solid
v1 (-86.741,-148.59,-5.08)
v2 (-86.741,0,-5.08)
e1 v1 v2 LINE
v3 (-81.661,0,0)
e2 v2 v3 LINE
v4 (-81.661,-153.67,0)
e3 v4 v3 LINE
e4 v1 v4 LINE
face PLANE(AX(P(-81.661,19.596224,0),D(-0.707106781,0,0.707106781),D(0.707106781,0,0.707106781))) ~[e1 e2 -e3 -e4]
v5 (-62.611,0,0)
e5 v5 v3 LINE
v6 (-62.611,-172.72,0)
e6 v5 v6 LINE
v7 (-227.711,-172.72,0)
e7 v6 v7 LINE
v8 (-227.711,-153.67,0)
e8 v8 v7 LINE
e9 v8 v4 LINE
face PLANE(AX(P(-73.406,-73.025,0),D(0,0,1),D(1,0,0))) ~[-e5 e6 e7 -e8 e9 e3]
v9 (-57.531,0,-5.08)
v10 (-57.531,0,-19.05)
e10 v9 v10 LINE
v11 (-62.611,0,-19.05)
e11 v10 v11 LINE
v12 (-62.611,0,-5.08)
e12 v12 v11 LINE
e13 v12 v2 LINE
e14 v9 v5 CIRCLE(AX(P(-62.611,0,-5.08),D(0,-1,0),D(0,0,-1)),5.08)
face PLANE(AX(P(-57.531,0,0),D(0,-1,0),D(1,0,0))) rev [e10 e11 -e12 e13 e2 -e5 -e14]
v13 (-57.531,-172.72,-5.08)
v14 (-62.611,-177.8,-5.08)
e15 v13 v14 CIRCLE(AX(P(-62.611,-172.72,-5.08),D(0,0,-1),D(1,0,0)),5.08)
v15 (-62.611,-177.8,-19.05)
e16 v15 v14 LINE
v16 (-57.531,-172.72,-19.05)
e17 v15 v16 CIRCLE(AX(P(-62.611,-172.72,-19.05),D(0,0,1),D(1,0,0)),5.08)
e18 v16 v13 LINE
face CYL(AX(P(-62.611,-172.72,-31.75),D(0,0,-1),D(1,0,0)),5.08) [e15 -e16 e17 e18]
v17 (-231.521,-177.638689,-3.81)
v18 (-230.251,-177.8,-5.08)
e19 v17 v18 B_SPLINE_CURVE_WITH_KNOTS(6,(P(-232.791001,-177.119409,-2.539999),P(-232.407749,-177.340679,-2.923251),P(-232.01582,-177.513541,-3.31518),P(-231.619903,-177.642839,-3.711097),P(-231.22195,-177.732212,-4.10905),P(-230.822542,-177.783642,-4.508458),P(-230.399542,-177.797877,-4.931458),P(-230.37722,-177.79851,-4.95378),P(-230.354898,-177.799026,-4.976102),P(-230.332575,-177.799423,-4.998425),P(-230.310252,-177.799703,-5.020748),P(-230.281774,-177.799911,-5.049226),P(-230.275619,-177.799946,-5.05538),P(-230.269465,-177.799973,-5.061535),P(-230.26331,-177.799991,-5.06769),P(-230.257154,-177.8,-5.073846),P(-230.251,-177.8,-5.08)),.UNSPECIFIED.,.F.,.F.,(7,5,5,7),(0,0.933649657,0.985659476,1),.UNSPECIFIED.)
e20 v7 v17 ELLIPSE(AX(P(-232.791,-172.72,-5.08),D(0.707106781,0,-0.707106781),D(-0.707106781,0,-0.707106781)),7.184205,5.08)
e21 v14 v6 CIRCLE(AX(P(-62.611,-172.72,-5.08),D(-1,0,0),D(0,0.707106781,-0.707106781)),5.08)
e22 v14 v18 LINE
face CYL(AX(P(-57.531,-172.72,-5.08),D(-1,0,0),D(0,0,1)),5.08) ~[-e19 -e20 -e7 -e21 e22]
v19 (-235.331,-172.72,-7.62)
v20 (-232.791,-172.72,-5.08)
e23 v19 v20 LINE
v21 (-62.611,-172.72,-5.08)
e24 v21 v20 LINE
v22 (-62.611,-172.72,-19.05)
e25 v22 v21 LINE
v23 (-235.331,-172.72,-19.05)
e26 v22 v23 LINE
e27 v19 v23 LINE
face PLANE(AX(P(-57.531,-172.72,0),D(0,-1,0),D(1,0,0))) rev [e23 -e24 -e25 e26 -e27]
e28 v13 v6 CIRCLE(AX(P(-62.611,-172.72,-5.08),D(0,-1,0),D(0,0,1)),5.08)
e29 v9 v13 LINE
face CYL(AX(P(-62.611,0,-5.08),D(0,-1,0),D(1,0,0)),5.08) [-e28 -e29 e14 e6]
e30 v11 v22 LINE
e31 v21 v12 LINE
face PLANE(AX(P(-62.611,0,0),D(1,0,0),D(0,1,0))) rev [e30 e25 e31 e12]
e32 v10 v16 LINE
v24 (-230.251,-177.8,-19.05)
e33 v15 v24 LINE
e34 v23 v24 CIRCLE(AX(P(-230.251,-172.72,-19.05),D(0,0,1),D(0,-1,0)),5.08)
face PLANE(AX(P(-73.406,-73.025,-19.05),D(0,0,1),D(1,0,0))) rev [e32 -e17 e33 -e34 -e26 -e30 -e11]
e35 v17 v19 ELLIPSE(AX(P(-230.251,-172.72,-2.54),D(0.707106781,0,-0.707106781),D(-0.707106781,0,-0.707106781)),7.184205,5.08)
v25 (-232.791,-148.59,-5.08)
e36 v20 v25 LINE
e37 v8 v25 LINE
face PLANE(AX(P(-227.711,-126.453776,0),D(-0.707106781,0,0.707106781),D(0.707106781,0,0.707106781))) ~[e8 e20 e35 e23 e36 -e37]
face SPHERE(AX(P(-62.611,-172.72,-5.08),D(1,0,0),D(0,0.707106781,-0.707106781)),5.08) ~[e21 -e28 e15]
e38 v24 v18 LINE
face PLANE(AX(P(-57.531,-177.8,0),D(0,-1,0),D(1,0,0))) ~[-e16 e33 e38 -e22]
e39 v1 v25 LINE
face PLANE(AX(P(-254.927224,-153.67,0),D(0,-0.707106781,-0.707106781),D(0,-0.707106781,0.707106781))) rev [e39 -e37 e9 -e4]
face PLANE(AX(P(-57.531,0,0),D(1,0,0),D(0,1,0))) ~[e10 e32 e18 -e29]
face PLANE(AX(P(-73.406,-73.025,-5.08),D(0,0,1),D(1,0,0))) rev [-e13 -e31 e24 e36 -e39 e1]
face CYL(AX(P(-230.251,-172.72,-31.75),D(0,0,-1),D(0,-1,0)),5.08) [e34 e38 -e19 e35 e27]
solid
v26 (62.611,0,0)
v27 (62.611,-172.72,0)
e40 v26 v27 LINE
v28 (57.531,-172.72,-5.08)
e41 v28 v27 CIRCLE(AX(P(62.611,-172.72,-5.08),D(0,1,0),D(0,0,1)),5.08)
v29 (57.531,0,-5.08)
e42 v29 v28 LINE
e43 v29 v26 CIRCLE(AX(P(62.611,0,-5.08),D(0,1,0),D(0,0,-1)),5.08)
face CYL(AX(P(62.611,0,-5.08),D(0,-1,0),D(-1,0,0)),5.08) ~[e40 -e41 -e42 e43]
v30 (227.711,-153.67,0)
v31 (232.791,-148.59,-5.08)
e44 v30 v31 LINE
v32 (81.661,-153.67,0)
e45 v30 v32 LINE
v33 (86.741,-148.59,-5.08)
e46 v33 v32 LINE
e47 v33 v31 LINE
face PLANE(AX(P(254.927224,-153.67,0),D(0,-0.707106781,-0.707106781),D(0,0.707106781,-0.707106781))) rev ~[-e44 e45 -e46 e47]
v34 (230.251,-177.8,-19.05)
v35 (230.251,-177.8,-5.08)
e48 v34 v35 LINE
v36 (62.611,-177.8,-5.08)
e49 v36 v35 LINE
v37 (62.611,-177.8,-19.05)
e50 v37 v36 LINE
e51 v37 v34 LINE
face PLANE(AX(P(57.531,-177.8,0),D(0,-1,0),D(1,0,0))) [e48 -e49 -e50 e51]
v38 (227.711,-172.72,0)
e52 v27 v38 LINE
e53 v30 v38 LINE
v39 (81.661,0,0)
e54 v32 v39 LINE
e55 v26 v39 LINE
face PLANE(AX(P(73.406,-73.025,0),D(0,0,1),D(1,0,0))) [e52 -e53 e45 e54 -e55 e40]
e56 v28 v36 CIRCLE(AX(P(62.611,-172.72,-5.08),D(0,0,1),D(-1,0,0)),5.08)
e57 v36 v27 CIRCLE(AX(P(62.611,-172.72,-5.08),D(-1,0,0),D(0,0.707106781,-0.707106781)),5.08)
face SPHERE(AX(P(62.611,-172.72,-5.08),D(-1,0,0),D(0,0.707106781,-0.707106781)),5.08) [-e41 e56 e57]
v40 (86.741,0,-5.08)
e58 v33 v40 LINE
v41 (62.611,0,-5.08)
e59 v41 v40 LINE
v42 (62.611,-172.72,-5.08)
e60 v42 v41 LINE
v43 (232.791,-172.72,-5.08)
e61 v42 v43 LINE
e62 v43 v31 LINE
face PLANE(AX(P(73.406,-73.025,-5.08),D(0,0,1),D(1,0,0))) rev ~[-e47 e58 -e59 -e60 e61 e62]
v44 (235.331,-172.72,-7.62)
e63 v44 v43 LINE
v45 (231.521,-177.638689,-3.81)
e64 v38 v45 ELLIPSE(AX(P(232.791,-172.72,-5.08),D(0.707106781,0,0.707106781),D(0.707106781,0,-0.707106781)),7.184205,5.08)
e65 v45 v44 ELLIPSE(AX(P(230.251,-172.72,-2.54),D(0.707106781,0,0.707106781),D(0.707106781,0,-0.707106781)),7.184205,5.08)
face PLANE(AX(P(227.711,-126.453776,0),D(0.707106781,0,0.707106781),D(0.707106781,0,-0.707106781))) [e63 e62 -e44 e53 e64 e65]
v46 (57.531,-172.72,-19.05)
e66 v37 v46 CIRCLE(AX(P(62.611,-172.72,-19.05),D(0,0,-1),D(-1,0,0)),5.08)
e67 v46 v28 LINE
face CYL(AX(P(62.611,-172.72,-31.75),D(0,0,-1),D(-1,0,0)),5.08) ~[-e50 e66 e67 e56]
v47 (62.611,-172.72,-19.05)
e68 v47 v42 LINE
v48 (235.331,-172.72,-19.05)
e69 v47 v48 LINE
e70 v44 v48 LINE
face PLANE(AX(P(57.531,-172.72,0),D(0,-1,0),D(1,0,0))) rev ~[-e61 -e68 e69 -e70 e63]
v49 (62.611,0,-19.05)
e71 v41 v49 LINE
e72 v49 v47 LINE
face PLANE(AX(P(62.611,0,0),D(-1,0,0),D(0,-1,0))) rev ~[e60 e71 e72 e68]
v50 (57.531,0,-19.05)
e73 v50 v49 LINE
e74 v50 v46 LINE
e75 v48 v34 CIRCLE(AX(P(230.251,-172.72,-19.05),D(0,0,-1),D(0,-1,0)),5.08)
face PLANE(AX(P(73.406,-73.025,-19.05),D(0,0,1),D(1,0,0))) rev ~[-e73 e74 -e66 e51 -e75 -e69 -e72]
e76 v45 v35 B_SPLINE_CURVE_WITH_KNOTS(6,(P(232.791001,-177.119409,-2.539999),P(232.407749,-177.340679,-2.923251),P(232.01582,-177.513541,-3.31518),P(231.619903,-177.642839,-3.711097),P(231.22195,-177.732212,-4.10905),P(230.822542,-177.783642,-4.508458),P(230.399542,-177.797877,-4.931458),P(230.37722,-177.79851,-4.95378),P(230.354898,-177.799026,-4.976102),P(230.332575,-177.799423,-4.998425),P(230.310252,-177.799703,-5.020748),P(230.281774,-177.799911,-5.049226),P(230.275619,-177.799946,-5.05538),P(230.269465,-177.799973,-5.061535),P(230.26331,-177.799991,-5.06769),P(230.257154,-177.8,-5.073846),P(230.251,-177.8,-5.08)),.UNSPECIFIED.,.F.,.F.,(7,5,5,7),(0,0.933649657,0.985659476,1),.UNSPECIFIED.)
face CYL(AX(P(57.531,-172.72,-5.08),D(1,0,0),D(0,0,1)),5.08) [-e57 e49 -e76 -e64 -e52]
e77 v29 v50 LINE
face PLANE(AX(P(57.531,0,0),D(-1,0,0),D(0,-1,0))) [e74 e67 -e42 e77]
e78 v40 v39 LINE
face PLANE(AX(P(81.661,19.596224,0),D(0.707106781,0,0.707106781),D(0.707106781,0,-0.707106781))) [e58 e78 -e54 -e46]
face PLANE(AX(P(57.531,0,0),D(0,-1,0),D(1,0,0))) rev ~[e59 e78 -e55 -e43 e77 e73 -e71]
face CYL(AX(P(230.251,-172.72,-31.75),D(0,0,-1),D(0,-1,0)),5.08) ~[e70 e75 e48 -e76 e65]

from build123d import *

# Parameters (mm, degrees)
F0_W         = 31.75
F0_H         = 146.05
F0_W_2       = 146.05
F0_H_2       = 31.75
F1_DEPTH     = 19.05
F2_T         = -5.08
F3_T1_DEPTH  = 165.6462243683
F3_T3_DEPTH  = 165.6462243683
F3_T5_DEPTH  = 70.9424487366
F3_T11_DEPTH = 185.2424487366
F3_T15_DEPTH = 185.2424487366
F4_R         = 5.08
F5_T1_DEPTH  = 26.67
F5_T3_DEPTH  = 36.83
F5_S7_W      = 5.08
F5_S7_H      = 5.08
F5_T8_DEPTH  = 5.08


# Not quite as in the source:
# - a fillet or chamfer that OpenCascade refuses, or shapes differently, is made with other operations: its cross-section is extruded or revolved along the edge and cut away or added
# - a feature names something its author has since deleted; it is built from what else it names


with BuildPart() as f1:
    # F0 (on Top) → F1 (new body)
    with BuildSketch(Plane.XY):
        with Locations((73.406, -73.025)):
            Rectangle(F0_W, F0_H)
        with Locations((162.306, -161.925)):
            Rectangle(F0_W_2, F0_H_2)
        with Locations((73.406, -161.925)):
            Rectangle(F0_W, F0_H_2)
    extrude(amount=-F1_DEPTH)

    # F2
    f2_openings = [f1.faces().sort_by_distance(p)[0] for p in [
        (86.766528, -73.025, -19.05),
        (162.306, -146.05, -9.525),
        (89.281, -73.025, -9.525),
        (73.406, 0, -9.525),
        (235.331, -161.925, -9.525),
    ]]
    offset(amount=F2_T, openings=f2_openings)

    # F3: chamfer of 7.62 on 3 edges, made by hand

    # F3_s2 → F3_t1 (cut)
    with BuildSketch(Plane.XZ.offset(-19.5962243683)):
        Polygon((81.661, 0), (89.281, -7.62), (89.281, 0), align=None)
    extrude(amount=F3_T1_DEPTH, mode=Mode.SUBTRACT)

    # F3_s4 → F3_t3 (cut)
    with BuildSketch(Plane.YZ.offset(89.281)):
        Polygon((-153.67, 0), (-146.05, -7.62), (-146.05, 0), align=None)
    extrude(amount=F3_T3_DEPTH, mode=Mode.SUBTRACT)

    # F3_s6 → F3_t5 (cut)
    with BuildSketch(Plane.XZ.offset(126.4537756317)):
        Polygon((227.711, 0), (235.331, -7.62), (235.331, 0), align=None)
    extrude(amount=F3_T5_DEPTH, mode=Mode.SUBTRACT)


with BuildPart() as f3_tool9:
    # F3_s10 → F3_t11 (new body)
    with BuildSketch(Plane.XZ.offset(165.6462243683)):
        Polygon((81.661, 0), (89.281, -7.62), (89.281, 0), align=None)
    extrude(amount=-F3_T11_DEPTH)

    split(bisect_by=Plane.XZ.offset(146.05), keep=Keep.TOP)


with BuildPart() as f3_tool13:
    # F3_s14 → F3_t15 (new body)
    with BuildSketch(Plane.YZ.offset(254.9272243683)):
        Polygon((-153.67, 0), (-146.05, -7.62), (-146.05, 0), align=None)
    extrude(amount=-F3_T15_DEPTH)

    split(bisect_by=Plane.YZ.offset(89.281), keep=Keep.BOTTOM)


with BuildPart() as f3_tool9_1:
    add(f3_tool9.part)

    # F3_t17: intersect F3_tool13
    add(f3_tool13.part, mode=Mode.INTERSECT)


with BuildPart() as f1_1:
    add(f1.part)

    # F3_t7: cut F3_tool9
    add(f3_tool9_1.part, mode=Mode.SUBTRACT)

    # F4
    f4_edges = [f1_1.edges().sort_by_distance(p)[0] for p in [
        (142.621, -177.8, 0),
        (57.531, -88.9, 0),
    ]]
    fillet(f4_edges, radius=F4_R)

    # F5: fillet of radius 5.08 on 2 edges, made by hand

    # F5_s2 → F5_t1 (cut)
    with BuildSketch(Plane.XY.offset(-31.75)):
        with BuildLine():
            ThreePointArc((57.531, -172.72), (59.0188975516, -176.3121024484), (62.611, -177.8))
            Line((62.611, -177.8), (57.531, -177.8))
            Line((57.531, -177.8), (57.531, -172.72))
        make_face()
    extrude(amount=F5_T1_DEPTH, mode=Mode.SUBTRACT)

    # F5_s4 → F5_t3 (cut)
    with BuildSketch(Plane.XY.offset(-31.75)):
        with BuildLine():
            ThreePointArc((230.251, -177.8), (233.8431024484, -176.3121024484), (235.331, -172.72))
            Line((235.331, -172.72), (235.331, -177.8))
            Line((235.331, -177.8), (230.251, -177.8))
        make_face()
    extrude(amount=F5_T3_DEPTH, mode=Mode.SUBTRACT)


with BuildPart() as f5_tool6:
    # F5_s7 → F5_t8 (new body)
    with BuildSketch(Plane.YZ.offset(62.611)):
        with Locations((-175.26, -2.54)):
            Rectangle(F5_S7_W, F5_S7_H)
    extrude(amount=-F5_T8_DEPTH)

    # F5_s9 → F5_t10 (revolve, cut)
    with BuildSketch(Plane(origin=(62.611, -172.72, -5.08), x_dir=(0, 0.7071067812, -0.7071067812), z_dir=(0, 0.7071067812, 0.7071067812))):
        with BuildLine():
            ThreePointArc((0, -5.08), (5.08, 0), (0, 5.08))
            Line((0, 5.08), (0, -5.08))
        make_face()
    revolve(axis=Axis((62.611, -172.72, -5.08), (-1, 0, 0)), mode=Mode.SUBTRACT)


with BuildPart() as f1_2:
    add(f1_1.part)

    # F5_t5: cut F5_tool6
    add(f5_tool6.part, mode=Mode.SUBTRACT)


with BuildPart() as f6_1:
    # F6: instance of F1
    add(f1_2.part.mirror(Plane.YZ))


solid = Compound([f1_2.part, f6_1.part])
